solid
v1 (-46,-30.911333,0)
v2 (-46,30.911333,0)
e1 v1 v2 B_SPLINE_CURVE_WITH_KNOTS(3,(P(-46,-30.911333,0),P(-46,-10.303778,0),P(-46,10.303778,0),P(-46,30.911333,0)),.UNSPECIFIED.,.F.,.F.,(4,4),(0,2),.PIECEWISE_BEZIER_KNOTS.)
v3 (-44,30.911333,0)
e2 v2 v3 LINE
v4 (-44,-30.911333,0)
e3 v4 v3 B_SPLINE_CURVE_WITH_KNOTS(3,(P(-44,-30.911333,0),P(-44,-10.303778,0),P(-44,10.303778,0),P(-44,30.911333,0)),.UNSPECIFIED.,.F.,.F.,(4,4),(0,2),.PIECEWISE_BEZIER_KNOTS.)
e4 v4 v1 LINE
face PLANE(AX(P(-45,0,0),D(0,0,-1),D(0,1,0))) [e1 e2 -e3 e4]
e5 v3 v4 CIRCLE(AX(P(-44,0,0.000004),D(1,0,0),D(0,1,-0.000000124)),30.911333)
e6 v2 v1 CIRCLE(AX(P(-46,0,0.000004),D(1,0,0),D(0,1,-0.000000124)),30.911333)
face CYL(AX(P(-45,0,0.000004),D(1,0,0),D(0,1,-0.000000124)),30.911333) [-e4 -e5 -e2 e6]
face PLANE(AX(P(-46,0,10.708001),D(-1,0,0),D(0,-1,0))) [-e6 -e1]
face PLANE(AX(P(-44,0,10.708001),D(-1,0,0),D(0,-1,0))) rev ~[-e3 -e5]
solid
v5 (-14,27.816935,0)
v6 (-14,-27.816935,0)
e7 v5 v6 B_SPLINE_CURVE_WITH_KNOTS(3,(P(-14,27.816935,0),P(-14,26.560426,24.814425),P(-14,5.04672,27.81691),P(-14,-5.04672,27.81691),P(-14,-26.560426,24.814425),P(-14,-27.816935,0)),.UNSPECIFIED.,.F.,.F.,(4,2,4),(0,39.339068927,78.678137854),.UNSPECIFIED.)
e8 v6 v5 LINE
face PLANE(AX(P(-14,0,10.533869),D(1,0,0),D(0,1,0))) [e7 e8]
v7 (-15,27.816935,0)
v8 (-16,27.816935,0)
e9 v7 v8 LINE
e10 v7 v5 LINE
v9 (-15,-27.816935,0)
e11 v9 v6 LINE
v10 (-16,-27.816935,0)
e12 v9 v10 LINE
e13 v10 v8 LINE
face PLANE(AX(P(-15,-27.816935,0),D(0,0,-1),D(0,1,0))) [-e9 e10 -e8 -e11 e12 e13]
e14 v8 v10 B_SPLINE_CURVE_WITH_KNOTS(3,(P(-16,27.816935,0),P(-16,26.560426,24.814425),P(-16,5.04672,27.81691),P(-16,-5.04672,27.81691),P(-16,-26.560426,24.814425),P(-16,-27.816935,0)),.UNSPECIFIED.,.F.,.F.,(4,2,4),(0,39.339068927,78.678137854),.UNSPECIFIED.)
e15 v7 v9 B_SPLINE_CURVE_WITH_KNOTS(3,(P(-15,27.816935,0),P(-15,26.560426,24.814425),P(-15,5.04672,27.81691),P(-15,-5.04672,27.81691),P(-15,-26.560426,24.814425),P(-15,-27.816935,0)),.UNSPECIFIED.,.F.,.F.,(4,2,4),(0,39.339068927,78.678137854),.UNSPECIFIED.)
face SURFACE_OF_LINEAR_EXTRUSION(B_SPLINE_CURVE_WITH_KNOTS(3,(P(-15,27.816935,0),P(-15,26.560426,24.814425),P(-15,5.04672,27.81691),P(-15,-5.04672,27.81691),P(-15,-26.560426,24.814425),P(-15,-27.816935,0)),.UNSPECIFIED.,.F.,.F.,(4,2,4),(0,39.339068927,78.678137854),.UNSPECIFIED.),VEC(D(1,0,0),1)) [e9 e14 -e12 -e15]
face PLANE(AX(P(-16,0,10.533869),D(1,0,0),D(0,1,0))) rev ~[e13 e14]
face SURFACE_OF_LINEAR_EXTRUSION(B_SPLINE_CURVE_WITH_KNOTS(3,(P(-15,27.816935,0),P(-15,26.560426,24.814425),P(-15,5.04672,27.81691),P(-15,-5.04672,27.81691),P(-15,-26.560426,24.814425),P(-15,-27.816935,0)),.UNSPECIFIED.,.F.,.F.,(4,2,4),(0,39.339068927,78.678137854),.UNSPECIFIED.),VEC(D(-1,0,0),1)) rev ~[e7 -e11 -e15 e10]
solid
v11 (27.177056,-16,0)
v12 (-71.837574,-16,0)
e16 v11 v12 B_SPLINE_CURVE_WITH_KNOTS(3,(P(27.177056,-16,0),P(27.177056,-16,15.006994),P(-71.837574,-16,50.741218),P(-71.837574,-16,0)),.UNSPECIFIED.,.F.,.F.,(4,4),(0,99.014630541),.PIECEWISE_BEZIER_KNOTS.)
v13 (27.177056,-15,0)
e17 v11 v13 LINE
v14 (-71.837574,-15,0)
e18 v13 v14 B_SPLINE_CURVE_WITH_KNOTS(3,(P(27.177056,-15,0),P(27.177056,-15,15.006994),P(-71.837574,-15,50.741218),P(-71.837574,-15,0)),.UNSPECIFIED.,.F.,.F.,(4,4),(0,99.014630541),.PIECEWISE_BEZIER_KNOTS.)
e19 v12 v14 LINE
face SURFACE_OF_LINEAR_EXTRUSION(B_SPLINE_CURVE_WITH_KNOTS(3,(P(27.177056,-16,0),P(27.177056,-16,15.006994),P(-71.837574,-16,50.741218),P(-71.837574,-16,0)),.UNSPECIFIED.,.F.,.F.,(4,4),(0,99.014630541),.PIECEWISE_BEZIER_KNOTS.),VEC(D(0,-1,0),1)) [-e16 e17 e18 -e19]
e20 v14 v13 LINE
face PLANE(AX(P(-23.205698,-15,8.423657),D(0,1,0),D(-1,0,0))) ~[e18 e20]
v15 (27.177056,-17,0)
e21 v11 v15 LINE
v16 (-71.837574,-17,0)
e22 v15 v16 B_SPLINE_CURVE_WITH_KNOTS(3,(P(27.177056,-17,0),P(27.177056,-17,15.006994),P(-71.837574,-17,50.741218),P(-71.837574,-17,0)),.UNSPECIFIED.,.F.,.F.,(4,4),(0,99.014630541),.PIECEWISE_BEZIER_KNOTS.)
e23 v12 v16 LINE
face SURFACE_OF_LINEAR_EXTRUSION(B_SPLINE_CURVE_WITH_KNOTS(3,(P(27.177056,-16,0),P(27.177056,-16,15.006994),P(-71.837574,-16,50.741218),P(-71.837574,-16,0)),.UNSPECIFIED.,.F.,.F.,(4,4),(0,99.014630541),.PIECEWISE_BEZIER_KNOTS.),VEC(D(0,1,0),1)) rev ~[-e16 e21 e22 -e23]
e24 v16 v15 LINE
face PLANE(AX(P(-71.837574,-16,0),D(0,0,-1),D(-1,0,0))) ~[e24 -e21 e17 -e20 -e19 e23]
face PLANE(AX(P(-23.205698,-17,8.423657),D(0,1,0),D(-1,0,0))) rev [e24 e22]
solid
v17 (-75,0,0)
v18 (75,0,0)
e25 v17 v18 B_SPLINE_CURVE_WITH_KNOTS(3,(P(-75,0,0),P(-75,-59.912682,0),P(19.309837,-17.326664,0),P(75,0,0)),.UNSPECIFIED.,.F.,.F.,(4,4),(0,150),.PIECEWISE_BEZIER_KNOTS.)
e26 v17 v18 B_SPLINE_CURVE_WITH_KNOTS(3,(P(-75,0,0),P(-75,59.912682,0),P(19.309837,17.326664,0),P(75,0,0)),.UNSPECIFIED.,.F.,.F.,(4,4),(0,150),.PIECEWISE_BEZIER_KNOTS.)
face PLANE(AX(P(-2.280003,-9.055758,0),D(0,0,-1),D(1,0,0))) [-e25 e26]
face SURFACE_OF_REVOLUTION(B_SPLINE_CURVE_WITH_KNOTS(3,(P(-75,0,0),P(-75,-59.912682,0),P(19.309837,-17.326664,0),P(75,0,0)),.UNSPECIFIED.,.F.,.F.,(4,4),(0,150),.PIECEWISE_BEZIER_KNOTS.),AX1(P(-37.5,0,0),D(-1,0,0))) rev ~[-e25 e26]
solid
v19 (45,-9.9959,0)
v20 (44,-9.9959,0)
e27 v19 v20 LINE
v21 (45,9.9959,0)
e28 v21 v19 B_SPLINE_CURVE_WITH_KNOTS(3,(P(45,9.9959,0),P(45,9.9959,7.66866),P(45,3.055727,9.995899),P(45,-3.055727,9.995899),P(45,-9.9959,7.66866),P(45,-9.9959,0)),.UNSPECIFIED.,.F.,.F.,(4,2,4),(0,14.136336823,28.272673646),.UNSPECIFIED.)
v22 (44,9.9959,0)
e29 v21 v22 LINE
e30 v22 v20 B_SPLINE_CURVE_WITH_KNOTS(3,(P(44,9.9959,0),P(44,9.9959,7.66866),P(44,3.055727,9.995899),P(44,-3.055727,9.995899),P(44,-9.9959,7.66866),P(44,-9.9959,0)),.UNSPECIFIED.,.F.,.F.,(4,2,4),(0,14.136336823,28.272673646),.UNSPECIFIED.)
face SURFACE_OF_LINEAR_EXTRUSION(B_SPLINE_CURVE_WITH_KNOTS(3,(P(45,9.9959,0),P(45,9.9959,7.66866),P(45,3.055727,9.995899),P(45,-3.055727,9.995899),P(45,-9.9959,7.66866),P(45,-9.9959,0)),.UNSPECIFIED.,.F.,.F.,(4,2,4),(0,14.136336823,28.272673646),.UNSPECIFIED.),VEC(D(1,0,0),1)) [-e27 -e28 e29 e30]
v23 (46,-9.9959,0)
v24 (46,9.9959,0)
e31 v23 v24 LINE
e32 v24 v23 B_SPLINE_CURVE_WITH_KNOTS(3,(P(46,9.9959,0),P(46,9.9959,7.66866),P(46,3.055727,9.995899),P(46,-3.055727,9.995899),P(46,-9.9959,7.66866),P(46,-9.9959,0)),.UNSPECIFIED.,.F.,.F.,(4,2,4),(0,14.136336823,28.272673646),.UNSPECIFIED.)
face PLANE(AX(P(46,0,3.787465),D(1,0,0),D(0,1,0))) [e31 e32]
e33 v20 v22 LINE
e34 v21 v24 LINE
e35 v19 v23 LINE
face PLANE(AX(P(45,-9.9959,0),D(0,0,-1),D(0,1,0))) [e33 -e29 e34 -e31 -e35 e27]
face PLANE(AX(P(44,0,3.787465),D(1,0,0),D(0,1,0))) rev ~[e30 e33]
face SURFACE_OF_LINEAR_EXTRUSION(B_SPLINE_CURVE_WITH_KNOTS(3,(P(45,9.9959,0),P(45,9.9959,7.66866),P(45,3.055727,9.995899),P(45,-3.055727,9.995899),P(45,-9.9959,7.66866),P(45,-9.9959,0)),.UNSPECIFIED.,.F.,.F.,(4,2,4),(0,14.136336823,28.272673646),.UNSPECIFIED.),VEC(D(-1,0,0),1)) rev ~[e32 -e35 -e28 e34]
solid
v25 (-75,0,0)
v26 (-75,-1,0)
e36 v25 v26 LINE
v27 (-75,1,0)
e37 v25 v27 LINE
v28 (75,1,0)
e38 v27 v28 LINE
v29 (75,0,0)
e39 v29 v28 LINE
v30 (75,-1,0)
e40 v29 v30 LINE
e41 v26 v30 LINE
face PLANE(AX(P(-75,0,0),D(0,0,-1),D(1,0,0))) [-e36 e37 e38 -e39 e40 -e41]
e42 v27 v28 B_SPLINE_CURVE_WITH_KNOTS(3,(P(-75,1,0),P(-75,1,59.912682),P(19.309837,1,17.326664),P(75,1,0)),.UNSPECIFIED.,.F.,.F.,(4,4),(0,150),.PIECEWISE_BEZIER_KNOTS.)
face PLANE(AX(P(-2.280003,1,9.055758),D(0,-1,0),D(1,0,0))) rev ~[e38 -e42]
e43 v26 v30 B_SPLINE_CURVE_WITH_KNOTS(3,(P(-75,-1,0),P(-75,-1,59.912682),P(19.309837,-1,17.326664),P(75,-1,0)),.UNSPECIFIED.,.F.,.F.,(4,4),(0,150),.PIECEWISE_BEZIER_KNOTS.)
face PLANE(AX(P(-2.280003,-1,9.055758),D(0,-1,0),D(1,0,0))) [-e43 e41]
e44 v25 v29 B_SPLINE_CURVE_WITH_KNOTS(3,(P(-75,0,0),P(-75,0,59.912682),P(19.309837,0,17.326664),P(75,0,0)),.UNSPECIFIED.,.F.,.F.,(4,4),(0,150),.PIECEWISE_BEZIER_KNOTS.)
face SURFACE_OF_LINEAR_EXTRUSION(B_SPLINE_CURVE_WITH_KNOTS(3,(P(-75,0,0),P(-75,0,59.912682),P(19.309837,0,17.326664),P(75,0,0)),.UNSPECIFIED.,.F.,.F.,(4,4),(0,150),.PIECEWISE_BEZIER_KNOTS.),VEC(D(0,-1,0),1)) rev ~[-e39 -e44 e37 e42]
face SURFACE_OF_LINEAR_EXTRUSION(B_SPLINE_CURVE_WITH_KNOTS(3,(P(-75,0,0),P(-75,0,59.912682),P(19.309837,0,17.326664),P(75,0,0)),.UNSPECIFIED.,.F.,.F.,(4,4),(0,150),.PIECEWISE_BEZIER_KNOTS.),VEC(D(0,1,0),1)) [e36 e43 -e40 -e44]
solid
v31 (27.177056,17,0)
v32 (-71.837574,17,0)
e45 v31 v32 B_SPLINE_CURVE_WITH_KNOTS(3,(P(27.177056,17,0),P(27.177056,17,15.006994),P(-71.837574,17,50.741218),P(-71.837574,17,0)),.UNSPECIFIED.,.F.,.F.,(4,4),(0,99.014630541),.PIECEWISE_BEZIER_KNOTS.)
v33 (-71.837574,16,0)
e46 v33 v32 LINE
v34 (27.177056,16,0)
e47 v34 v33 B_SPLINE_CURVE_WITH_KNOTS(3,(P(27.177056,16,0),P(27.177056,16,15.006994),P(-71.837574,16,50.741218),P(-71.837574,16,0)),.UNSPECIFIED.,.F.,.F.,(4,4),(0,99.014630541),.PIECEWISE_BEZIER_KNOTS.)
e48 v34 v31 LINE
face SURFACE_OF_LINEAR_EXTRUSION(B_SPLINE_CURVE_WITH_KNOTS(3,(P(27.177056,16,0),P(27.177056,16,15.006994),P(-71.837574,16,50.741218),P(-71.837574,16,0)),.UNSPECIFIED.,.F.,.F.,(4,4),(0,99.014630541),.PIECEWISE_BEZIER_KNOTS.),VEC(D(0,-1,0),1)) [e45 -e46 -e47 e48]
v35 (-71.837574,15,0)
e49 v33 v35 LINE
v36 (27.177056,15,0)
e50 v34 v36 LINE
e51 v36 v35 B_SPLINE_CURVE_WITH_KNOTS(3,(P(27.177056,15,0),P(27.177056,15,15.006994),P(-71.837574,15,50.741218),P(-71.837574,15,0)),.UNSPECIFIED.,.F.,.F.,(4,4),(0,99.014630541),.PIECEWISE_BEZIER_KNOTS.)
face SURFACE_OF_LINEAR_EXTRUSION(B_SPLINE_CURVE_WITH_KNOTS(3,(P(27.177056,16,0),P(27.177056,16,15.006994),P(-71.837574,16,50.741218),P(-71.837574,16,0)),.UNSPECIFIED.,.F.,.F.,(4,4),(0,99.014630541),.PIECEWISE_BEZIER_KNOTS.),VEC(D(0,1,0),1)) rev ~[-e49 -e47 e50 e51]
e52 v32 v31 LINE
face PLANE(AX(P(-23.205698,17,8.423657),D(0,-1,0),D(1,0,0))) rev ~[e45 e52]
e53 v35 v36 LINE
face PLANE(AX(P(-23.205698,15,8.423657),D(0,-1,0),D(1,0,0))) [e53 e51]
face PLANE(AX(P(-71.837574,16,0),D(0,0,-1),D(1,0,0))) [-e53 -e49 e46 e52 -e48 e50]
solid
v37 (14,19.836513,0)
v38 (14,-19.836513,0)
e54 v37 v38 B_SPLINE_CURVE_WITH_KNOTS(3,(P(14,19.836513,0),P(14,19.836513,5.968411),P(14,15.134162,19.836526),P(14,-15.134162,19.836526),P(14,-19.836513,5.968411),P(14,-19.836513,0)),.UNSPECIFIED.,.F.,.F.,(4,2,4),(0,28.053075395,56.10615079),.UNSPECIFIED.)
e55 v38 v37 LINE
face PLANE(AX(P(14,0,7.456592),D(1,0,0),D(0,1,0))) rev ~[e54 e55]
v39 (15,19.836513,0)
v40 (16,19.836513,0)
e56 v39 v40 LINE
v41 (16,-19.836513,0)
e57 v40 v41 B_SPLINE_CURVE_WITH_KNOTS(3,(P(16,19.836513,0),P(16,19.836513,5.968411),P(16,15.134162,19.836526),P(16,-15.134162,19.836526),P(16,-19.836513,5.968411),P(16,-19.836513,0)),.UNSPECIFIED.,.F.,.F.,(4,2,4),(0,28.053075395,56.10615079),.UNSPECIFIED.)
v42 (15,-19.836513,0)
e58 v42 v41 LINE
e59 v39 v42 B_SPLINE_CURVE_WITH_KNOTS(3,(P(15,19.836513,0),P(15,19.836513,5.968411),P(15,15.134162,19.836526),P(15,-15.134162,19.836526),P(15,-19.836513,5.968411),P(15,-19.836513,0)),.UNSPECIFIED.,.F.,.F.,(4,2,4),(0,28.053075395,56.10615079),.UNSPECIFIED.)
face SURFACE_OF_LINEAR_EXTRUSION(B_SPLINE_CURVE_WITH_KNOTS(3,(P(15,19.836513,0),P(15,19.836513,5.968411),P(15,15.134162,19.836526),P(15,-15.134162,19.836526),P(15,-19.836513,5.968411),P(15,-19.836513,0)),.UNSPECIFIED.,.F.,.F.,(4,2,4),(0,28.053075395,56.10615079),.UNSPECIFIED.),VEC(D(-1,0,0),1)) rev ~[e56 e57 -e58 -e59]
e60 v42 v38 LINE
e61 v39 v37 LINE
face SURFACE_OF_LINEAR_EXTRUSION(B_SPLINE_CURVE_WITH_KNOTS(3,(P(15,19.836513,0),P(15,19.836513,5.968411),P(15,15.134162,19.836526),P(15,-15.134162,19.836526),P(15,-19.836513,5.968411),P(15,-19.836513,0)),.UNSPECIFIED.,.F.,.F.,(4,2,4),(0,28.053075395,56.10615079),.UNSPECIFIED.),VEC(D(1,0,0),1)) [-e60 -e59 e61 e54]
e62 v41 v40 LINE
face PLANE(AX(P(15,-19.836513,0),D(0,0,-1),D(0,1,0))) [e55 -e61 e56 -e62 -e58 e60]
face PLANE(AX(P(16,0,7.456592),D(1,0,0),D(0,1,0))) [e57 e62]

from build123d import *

# Parameters (mm, degrees)
F1_ANGLE_BACK = 90
F1_ANGLE      = 180
F11_DEPTH     = 1
F12_DEPTH     = 1
F13_DEPTH     = 1
F16_DEPTH     = 1


# Not quite as in the source:
# - ends of sketch curves that miss each other by under 0.0002 mm in the source are joined


with BuildPart() as f1:
    # F0 (on Front) → F1 (revolve)
    with BuildSketch(Plane.XZ, mode=Mode.PRIVATE) as f1_sk:
        with BuildLine():
            Line((-75, 0), (0, 0))
            Line((0, 0), (75, 0))
            add(Edge.make_bspline(
                [(-75, 0), (-75, 59.9126815796), (19.3098373711, 17.3266641796), (75, 0)],
                knots=[0, 0, 0, 0, 150, 150, 150, 150], degree=3))
        make_face()
    revolve(f1_sk.sketch.rotate(Axis((-37.5, 0, 0), (-1, 0, 0)), -F1_ANGLE_BACK), axis=Axis((-37.5, 0, 0), (-1, 0, 0)), revolution_arc=F1_ANGLE)


with BuildPart() as f11:
    # F7 (on offset) → F11 (new body, symmetric)
    with BuildSketch(Plane.YZ.offset(-45)):
        with BuildLine():
            add(Edge.make_bspline(
                [(0, 0), (-10.3037776914, 0), (-20.6075553827, 0), (-30.9113330741, 0)],
                knots=[0, 0, 0, 0, 1, 1, 1, 1], degree=3))
            add(Edge.make_bspline(
                [(0, 0), (10.3037776914, 0), (20.6075553827, 0), (30.9113330741, 0)],
                knots=[0, 0, 0, 0, 1, 1, 1, 1], degree=3))
            ThreePointArc((30.9113330741, 0), (0, 30.9113368971), (-30.9113330741, 0))
        make_face()
    extrude(amount=F11_DEPTH, both=True)


with BuildPart() as f12:
    # F8 (on offset) → F12 (new body, symmetric)
    with BuildSketch(Plane.YZ.offset(-15)):
        with BuildLine():
            Line((-27.8169345111, 0), (0, 0))
            Line((0, 0), (27.8169345111, 0))
            add(Edge.make_bspline(
                [(0, 27.8169102967), (5.0467201509, 27.8169102967), (26.5604257584, 24.8144250363), (27.8169345111, 0)],
                knots=[0, 0, 0, 0, 39.339068927, 39.339068927, 39.339068927, 39.339068927], degree=3))
            add(Edge.make_bspline(
                [(0, 27.8169102967), (-5.0467201509, 27.8169102967), (-26.5604257584, 24.8144250363), (-27.8169345111, 0)],
                knots=[0, 0, 0, 0, 39.339068927, 39.339068927, 39.339068927, 39.339068927], degree=3))
        make_face()
    extrude(amount=F12_DEPTH, both=True)


with BuildPart() as f12b:
    # F9 (on offset) → F12, piece 2 (new body, symmetric)
    with BuildSketch(Plane.YZ.offset(15)):
        with BuildLine():
            Line((-19.8365133256, 0), (0, 0))
            Line((0, 0), (19.8365133256, 0))
            add(Edge.make_bspline(
                [(19.8365133256, 0), (19.8365133256, 5.9684109874), (15.1341622695, 19.8365263641), (0, 19.8365263641)],
                knots=[0, 0, 0, 0, 28.0530753948, 28.0530753948, 28.0530753948, 28.0530753948], degree=3))
            add(Edge.make_bspline(
                [(-19.8365133256, 0), (-19.8365133256, 5.9684109874), (-15.1341622695, 19.8365263641), (0, 19.8365263641)],
                knots=[0, 0, 0, 0, 28.0530753948, 28.0530753948, 28.0530753948, 28.0530753948], degree=3))
        make_face()
    extrude(amount=F12_DEPTH, both=True)


with BuildPart() as f12c:
    # F10 (on offset) → F12, piece 3 (new body, symmetric)
    with BuildSketch(Plane.YZ.offset(45)):
        with BuildLine():
            Line((-9.9959000945, 0), (0, 0))
            Line((0, 0), (9.9959000945, 0))
            add(Edge.make_bspline(
                [(0, 9.9958991632), (3.0557271093, 9.9958991632), (9.9959000945, 7.6686600223), (9.9959000945, 0)],
                knots=[0, 0, 0, 0, 14.1363368232, 14.1363368232, 14.1363368232, 14.1363368232], degree=3))
            add(Edge.make_bspline(
                [(0, 9.9958991632), (-3.0557271093, 9.9958991632), (-9.9959000945, 7.6686600223), (-9.9959000945, 0)],
                knots=[0, 0, 0, 0, 14.1363368232, 14.1363368232, 14.1363368232, 14.1363368232], degree=3))
        make_face()
    extrude(amount=F12_DEPTH, both=True)


with BuildPart() as f13:
    # F0 (on Front) → F13 (new body, symmetric)
    with BuildSketch(Plane.XZ):
        with BuildLine():
            Line((-75, 0), (0, 0))
            Line((0, 0), (75, 0))
            add(Edge.make_bspline(
                [(-75, 0), (-75, 59.9126815796), (19.3098373711, 17.3266641796), (75, 0)],
                knots=[0, 0, 0, 0, 150, 150, 150, 150], degree=3))
        make_face()
    extrude(amount=F13_DEPTH, both=True)


with BuildPart() as f16:
    # F15 (on offset) → F16 (new body, symmetric)
    with BuildSketch(Plane.XZ.offset(-16)):
        with BuildLine():
            Line((-71.8375742435, 0), (27.1770562977, 0))
            add(Edge.make_bspline(
                [(27.1770562977, 0), (27.1770562977, 15.0069938973), (-71.8375742435, 50.7412180305), (-71.8375742435, 0)],
                knots=[0, 0, 0, 0, 99.0146305412, 99.0146305412, 99.0146305412, 99.0146305412], degree=3))
        make_face()
    extrude(amount=F16_DEPTH, both=True)


with BuildPart() as f17_1:
    # F17: instance of F16
    add(f16.part.mirror(Plane.XZ))


solid = Compound([f1.part, f11.part, f12.part, f12b.part, f12c.part, f13.part, f16.part, f17_1.part])
